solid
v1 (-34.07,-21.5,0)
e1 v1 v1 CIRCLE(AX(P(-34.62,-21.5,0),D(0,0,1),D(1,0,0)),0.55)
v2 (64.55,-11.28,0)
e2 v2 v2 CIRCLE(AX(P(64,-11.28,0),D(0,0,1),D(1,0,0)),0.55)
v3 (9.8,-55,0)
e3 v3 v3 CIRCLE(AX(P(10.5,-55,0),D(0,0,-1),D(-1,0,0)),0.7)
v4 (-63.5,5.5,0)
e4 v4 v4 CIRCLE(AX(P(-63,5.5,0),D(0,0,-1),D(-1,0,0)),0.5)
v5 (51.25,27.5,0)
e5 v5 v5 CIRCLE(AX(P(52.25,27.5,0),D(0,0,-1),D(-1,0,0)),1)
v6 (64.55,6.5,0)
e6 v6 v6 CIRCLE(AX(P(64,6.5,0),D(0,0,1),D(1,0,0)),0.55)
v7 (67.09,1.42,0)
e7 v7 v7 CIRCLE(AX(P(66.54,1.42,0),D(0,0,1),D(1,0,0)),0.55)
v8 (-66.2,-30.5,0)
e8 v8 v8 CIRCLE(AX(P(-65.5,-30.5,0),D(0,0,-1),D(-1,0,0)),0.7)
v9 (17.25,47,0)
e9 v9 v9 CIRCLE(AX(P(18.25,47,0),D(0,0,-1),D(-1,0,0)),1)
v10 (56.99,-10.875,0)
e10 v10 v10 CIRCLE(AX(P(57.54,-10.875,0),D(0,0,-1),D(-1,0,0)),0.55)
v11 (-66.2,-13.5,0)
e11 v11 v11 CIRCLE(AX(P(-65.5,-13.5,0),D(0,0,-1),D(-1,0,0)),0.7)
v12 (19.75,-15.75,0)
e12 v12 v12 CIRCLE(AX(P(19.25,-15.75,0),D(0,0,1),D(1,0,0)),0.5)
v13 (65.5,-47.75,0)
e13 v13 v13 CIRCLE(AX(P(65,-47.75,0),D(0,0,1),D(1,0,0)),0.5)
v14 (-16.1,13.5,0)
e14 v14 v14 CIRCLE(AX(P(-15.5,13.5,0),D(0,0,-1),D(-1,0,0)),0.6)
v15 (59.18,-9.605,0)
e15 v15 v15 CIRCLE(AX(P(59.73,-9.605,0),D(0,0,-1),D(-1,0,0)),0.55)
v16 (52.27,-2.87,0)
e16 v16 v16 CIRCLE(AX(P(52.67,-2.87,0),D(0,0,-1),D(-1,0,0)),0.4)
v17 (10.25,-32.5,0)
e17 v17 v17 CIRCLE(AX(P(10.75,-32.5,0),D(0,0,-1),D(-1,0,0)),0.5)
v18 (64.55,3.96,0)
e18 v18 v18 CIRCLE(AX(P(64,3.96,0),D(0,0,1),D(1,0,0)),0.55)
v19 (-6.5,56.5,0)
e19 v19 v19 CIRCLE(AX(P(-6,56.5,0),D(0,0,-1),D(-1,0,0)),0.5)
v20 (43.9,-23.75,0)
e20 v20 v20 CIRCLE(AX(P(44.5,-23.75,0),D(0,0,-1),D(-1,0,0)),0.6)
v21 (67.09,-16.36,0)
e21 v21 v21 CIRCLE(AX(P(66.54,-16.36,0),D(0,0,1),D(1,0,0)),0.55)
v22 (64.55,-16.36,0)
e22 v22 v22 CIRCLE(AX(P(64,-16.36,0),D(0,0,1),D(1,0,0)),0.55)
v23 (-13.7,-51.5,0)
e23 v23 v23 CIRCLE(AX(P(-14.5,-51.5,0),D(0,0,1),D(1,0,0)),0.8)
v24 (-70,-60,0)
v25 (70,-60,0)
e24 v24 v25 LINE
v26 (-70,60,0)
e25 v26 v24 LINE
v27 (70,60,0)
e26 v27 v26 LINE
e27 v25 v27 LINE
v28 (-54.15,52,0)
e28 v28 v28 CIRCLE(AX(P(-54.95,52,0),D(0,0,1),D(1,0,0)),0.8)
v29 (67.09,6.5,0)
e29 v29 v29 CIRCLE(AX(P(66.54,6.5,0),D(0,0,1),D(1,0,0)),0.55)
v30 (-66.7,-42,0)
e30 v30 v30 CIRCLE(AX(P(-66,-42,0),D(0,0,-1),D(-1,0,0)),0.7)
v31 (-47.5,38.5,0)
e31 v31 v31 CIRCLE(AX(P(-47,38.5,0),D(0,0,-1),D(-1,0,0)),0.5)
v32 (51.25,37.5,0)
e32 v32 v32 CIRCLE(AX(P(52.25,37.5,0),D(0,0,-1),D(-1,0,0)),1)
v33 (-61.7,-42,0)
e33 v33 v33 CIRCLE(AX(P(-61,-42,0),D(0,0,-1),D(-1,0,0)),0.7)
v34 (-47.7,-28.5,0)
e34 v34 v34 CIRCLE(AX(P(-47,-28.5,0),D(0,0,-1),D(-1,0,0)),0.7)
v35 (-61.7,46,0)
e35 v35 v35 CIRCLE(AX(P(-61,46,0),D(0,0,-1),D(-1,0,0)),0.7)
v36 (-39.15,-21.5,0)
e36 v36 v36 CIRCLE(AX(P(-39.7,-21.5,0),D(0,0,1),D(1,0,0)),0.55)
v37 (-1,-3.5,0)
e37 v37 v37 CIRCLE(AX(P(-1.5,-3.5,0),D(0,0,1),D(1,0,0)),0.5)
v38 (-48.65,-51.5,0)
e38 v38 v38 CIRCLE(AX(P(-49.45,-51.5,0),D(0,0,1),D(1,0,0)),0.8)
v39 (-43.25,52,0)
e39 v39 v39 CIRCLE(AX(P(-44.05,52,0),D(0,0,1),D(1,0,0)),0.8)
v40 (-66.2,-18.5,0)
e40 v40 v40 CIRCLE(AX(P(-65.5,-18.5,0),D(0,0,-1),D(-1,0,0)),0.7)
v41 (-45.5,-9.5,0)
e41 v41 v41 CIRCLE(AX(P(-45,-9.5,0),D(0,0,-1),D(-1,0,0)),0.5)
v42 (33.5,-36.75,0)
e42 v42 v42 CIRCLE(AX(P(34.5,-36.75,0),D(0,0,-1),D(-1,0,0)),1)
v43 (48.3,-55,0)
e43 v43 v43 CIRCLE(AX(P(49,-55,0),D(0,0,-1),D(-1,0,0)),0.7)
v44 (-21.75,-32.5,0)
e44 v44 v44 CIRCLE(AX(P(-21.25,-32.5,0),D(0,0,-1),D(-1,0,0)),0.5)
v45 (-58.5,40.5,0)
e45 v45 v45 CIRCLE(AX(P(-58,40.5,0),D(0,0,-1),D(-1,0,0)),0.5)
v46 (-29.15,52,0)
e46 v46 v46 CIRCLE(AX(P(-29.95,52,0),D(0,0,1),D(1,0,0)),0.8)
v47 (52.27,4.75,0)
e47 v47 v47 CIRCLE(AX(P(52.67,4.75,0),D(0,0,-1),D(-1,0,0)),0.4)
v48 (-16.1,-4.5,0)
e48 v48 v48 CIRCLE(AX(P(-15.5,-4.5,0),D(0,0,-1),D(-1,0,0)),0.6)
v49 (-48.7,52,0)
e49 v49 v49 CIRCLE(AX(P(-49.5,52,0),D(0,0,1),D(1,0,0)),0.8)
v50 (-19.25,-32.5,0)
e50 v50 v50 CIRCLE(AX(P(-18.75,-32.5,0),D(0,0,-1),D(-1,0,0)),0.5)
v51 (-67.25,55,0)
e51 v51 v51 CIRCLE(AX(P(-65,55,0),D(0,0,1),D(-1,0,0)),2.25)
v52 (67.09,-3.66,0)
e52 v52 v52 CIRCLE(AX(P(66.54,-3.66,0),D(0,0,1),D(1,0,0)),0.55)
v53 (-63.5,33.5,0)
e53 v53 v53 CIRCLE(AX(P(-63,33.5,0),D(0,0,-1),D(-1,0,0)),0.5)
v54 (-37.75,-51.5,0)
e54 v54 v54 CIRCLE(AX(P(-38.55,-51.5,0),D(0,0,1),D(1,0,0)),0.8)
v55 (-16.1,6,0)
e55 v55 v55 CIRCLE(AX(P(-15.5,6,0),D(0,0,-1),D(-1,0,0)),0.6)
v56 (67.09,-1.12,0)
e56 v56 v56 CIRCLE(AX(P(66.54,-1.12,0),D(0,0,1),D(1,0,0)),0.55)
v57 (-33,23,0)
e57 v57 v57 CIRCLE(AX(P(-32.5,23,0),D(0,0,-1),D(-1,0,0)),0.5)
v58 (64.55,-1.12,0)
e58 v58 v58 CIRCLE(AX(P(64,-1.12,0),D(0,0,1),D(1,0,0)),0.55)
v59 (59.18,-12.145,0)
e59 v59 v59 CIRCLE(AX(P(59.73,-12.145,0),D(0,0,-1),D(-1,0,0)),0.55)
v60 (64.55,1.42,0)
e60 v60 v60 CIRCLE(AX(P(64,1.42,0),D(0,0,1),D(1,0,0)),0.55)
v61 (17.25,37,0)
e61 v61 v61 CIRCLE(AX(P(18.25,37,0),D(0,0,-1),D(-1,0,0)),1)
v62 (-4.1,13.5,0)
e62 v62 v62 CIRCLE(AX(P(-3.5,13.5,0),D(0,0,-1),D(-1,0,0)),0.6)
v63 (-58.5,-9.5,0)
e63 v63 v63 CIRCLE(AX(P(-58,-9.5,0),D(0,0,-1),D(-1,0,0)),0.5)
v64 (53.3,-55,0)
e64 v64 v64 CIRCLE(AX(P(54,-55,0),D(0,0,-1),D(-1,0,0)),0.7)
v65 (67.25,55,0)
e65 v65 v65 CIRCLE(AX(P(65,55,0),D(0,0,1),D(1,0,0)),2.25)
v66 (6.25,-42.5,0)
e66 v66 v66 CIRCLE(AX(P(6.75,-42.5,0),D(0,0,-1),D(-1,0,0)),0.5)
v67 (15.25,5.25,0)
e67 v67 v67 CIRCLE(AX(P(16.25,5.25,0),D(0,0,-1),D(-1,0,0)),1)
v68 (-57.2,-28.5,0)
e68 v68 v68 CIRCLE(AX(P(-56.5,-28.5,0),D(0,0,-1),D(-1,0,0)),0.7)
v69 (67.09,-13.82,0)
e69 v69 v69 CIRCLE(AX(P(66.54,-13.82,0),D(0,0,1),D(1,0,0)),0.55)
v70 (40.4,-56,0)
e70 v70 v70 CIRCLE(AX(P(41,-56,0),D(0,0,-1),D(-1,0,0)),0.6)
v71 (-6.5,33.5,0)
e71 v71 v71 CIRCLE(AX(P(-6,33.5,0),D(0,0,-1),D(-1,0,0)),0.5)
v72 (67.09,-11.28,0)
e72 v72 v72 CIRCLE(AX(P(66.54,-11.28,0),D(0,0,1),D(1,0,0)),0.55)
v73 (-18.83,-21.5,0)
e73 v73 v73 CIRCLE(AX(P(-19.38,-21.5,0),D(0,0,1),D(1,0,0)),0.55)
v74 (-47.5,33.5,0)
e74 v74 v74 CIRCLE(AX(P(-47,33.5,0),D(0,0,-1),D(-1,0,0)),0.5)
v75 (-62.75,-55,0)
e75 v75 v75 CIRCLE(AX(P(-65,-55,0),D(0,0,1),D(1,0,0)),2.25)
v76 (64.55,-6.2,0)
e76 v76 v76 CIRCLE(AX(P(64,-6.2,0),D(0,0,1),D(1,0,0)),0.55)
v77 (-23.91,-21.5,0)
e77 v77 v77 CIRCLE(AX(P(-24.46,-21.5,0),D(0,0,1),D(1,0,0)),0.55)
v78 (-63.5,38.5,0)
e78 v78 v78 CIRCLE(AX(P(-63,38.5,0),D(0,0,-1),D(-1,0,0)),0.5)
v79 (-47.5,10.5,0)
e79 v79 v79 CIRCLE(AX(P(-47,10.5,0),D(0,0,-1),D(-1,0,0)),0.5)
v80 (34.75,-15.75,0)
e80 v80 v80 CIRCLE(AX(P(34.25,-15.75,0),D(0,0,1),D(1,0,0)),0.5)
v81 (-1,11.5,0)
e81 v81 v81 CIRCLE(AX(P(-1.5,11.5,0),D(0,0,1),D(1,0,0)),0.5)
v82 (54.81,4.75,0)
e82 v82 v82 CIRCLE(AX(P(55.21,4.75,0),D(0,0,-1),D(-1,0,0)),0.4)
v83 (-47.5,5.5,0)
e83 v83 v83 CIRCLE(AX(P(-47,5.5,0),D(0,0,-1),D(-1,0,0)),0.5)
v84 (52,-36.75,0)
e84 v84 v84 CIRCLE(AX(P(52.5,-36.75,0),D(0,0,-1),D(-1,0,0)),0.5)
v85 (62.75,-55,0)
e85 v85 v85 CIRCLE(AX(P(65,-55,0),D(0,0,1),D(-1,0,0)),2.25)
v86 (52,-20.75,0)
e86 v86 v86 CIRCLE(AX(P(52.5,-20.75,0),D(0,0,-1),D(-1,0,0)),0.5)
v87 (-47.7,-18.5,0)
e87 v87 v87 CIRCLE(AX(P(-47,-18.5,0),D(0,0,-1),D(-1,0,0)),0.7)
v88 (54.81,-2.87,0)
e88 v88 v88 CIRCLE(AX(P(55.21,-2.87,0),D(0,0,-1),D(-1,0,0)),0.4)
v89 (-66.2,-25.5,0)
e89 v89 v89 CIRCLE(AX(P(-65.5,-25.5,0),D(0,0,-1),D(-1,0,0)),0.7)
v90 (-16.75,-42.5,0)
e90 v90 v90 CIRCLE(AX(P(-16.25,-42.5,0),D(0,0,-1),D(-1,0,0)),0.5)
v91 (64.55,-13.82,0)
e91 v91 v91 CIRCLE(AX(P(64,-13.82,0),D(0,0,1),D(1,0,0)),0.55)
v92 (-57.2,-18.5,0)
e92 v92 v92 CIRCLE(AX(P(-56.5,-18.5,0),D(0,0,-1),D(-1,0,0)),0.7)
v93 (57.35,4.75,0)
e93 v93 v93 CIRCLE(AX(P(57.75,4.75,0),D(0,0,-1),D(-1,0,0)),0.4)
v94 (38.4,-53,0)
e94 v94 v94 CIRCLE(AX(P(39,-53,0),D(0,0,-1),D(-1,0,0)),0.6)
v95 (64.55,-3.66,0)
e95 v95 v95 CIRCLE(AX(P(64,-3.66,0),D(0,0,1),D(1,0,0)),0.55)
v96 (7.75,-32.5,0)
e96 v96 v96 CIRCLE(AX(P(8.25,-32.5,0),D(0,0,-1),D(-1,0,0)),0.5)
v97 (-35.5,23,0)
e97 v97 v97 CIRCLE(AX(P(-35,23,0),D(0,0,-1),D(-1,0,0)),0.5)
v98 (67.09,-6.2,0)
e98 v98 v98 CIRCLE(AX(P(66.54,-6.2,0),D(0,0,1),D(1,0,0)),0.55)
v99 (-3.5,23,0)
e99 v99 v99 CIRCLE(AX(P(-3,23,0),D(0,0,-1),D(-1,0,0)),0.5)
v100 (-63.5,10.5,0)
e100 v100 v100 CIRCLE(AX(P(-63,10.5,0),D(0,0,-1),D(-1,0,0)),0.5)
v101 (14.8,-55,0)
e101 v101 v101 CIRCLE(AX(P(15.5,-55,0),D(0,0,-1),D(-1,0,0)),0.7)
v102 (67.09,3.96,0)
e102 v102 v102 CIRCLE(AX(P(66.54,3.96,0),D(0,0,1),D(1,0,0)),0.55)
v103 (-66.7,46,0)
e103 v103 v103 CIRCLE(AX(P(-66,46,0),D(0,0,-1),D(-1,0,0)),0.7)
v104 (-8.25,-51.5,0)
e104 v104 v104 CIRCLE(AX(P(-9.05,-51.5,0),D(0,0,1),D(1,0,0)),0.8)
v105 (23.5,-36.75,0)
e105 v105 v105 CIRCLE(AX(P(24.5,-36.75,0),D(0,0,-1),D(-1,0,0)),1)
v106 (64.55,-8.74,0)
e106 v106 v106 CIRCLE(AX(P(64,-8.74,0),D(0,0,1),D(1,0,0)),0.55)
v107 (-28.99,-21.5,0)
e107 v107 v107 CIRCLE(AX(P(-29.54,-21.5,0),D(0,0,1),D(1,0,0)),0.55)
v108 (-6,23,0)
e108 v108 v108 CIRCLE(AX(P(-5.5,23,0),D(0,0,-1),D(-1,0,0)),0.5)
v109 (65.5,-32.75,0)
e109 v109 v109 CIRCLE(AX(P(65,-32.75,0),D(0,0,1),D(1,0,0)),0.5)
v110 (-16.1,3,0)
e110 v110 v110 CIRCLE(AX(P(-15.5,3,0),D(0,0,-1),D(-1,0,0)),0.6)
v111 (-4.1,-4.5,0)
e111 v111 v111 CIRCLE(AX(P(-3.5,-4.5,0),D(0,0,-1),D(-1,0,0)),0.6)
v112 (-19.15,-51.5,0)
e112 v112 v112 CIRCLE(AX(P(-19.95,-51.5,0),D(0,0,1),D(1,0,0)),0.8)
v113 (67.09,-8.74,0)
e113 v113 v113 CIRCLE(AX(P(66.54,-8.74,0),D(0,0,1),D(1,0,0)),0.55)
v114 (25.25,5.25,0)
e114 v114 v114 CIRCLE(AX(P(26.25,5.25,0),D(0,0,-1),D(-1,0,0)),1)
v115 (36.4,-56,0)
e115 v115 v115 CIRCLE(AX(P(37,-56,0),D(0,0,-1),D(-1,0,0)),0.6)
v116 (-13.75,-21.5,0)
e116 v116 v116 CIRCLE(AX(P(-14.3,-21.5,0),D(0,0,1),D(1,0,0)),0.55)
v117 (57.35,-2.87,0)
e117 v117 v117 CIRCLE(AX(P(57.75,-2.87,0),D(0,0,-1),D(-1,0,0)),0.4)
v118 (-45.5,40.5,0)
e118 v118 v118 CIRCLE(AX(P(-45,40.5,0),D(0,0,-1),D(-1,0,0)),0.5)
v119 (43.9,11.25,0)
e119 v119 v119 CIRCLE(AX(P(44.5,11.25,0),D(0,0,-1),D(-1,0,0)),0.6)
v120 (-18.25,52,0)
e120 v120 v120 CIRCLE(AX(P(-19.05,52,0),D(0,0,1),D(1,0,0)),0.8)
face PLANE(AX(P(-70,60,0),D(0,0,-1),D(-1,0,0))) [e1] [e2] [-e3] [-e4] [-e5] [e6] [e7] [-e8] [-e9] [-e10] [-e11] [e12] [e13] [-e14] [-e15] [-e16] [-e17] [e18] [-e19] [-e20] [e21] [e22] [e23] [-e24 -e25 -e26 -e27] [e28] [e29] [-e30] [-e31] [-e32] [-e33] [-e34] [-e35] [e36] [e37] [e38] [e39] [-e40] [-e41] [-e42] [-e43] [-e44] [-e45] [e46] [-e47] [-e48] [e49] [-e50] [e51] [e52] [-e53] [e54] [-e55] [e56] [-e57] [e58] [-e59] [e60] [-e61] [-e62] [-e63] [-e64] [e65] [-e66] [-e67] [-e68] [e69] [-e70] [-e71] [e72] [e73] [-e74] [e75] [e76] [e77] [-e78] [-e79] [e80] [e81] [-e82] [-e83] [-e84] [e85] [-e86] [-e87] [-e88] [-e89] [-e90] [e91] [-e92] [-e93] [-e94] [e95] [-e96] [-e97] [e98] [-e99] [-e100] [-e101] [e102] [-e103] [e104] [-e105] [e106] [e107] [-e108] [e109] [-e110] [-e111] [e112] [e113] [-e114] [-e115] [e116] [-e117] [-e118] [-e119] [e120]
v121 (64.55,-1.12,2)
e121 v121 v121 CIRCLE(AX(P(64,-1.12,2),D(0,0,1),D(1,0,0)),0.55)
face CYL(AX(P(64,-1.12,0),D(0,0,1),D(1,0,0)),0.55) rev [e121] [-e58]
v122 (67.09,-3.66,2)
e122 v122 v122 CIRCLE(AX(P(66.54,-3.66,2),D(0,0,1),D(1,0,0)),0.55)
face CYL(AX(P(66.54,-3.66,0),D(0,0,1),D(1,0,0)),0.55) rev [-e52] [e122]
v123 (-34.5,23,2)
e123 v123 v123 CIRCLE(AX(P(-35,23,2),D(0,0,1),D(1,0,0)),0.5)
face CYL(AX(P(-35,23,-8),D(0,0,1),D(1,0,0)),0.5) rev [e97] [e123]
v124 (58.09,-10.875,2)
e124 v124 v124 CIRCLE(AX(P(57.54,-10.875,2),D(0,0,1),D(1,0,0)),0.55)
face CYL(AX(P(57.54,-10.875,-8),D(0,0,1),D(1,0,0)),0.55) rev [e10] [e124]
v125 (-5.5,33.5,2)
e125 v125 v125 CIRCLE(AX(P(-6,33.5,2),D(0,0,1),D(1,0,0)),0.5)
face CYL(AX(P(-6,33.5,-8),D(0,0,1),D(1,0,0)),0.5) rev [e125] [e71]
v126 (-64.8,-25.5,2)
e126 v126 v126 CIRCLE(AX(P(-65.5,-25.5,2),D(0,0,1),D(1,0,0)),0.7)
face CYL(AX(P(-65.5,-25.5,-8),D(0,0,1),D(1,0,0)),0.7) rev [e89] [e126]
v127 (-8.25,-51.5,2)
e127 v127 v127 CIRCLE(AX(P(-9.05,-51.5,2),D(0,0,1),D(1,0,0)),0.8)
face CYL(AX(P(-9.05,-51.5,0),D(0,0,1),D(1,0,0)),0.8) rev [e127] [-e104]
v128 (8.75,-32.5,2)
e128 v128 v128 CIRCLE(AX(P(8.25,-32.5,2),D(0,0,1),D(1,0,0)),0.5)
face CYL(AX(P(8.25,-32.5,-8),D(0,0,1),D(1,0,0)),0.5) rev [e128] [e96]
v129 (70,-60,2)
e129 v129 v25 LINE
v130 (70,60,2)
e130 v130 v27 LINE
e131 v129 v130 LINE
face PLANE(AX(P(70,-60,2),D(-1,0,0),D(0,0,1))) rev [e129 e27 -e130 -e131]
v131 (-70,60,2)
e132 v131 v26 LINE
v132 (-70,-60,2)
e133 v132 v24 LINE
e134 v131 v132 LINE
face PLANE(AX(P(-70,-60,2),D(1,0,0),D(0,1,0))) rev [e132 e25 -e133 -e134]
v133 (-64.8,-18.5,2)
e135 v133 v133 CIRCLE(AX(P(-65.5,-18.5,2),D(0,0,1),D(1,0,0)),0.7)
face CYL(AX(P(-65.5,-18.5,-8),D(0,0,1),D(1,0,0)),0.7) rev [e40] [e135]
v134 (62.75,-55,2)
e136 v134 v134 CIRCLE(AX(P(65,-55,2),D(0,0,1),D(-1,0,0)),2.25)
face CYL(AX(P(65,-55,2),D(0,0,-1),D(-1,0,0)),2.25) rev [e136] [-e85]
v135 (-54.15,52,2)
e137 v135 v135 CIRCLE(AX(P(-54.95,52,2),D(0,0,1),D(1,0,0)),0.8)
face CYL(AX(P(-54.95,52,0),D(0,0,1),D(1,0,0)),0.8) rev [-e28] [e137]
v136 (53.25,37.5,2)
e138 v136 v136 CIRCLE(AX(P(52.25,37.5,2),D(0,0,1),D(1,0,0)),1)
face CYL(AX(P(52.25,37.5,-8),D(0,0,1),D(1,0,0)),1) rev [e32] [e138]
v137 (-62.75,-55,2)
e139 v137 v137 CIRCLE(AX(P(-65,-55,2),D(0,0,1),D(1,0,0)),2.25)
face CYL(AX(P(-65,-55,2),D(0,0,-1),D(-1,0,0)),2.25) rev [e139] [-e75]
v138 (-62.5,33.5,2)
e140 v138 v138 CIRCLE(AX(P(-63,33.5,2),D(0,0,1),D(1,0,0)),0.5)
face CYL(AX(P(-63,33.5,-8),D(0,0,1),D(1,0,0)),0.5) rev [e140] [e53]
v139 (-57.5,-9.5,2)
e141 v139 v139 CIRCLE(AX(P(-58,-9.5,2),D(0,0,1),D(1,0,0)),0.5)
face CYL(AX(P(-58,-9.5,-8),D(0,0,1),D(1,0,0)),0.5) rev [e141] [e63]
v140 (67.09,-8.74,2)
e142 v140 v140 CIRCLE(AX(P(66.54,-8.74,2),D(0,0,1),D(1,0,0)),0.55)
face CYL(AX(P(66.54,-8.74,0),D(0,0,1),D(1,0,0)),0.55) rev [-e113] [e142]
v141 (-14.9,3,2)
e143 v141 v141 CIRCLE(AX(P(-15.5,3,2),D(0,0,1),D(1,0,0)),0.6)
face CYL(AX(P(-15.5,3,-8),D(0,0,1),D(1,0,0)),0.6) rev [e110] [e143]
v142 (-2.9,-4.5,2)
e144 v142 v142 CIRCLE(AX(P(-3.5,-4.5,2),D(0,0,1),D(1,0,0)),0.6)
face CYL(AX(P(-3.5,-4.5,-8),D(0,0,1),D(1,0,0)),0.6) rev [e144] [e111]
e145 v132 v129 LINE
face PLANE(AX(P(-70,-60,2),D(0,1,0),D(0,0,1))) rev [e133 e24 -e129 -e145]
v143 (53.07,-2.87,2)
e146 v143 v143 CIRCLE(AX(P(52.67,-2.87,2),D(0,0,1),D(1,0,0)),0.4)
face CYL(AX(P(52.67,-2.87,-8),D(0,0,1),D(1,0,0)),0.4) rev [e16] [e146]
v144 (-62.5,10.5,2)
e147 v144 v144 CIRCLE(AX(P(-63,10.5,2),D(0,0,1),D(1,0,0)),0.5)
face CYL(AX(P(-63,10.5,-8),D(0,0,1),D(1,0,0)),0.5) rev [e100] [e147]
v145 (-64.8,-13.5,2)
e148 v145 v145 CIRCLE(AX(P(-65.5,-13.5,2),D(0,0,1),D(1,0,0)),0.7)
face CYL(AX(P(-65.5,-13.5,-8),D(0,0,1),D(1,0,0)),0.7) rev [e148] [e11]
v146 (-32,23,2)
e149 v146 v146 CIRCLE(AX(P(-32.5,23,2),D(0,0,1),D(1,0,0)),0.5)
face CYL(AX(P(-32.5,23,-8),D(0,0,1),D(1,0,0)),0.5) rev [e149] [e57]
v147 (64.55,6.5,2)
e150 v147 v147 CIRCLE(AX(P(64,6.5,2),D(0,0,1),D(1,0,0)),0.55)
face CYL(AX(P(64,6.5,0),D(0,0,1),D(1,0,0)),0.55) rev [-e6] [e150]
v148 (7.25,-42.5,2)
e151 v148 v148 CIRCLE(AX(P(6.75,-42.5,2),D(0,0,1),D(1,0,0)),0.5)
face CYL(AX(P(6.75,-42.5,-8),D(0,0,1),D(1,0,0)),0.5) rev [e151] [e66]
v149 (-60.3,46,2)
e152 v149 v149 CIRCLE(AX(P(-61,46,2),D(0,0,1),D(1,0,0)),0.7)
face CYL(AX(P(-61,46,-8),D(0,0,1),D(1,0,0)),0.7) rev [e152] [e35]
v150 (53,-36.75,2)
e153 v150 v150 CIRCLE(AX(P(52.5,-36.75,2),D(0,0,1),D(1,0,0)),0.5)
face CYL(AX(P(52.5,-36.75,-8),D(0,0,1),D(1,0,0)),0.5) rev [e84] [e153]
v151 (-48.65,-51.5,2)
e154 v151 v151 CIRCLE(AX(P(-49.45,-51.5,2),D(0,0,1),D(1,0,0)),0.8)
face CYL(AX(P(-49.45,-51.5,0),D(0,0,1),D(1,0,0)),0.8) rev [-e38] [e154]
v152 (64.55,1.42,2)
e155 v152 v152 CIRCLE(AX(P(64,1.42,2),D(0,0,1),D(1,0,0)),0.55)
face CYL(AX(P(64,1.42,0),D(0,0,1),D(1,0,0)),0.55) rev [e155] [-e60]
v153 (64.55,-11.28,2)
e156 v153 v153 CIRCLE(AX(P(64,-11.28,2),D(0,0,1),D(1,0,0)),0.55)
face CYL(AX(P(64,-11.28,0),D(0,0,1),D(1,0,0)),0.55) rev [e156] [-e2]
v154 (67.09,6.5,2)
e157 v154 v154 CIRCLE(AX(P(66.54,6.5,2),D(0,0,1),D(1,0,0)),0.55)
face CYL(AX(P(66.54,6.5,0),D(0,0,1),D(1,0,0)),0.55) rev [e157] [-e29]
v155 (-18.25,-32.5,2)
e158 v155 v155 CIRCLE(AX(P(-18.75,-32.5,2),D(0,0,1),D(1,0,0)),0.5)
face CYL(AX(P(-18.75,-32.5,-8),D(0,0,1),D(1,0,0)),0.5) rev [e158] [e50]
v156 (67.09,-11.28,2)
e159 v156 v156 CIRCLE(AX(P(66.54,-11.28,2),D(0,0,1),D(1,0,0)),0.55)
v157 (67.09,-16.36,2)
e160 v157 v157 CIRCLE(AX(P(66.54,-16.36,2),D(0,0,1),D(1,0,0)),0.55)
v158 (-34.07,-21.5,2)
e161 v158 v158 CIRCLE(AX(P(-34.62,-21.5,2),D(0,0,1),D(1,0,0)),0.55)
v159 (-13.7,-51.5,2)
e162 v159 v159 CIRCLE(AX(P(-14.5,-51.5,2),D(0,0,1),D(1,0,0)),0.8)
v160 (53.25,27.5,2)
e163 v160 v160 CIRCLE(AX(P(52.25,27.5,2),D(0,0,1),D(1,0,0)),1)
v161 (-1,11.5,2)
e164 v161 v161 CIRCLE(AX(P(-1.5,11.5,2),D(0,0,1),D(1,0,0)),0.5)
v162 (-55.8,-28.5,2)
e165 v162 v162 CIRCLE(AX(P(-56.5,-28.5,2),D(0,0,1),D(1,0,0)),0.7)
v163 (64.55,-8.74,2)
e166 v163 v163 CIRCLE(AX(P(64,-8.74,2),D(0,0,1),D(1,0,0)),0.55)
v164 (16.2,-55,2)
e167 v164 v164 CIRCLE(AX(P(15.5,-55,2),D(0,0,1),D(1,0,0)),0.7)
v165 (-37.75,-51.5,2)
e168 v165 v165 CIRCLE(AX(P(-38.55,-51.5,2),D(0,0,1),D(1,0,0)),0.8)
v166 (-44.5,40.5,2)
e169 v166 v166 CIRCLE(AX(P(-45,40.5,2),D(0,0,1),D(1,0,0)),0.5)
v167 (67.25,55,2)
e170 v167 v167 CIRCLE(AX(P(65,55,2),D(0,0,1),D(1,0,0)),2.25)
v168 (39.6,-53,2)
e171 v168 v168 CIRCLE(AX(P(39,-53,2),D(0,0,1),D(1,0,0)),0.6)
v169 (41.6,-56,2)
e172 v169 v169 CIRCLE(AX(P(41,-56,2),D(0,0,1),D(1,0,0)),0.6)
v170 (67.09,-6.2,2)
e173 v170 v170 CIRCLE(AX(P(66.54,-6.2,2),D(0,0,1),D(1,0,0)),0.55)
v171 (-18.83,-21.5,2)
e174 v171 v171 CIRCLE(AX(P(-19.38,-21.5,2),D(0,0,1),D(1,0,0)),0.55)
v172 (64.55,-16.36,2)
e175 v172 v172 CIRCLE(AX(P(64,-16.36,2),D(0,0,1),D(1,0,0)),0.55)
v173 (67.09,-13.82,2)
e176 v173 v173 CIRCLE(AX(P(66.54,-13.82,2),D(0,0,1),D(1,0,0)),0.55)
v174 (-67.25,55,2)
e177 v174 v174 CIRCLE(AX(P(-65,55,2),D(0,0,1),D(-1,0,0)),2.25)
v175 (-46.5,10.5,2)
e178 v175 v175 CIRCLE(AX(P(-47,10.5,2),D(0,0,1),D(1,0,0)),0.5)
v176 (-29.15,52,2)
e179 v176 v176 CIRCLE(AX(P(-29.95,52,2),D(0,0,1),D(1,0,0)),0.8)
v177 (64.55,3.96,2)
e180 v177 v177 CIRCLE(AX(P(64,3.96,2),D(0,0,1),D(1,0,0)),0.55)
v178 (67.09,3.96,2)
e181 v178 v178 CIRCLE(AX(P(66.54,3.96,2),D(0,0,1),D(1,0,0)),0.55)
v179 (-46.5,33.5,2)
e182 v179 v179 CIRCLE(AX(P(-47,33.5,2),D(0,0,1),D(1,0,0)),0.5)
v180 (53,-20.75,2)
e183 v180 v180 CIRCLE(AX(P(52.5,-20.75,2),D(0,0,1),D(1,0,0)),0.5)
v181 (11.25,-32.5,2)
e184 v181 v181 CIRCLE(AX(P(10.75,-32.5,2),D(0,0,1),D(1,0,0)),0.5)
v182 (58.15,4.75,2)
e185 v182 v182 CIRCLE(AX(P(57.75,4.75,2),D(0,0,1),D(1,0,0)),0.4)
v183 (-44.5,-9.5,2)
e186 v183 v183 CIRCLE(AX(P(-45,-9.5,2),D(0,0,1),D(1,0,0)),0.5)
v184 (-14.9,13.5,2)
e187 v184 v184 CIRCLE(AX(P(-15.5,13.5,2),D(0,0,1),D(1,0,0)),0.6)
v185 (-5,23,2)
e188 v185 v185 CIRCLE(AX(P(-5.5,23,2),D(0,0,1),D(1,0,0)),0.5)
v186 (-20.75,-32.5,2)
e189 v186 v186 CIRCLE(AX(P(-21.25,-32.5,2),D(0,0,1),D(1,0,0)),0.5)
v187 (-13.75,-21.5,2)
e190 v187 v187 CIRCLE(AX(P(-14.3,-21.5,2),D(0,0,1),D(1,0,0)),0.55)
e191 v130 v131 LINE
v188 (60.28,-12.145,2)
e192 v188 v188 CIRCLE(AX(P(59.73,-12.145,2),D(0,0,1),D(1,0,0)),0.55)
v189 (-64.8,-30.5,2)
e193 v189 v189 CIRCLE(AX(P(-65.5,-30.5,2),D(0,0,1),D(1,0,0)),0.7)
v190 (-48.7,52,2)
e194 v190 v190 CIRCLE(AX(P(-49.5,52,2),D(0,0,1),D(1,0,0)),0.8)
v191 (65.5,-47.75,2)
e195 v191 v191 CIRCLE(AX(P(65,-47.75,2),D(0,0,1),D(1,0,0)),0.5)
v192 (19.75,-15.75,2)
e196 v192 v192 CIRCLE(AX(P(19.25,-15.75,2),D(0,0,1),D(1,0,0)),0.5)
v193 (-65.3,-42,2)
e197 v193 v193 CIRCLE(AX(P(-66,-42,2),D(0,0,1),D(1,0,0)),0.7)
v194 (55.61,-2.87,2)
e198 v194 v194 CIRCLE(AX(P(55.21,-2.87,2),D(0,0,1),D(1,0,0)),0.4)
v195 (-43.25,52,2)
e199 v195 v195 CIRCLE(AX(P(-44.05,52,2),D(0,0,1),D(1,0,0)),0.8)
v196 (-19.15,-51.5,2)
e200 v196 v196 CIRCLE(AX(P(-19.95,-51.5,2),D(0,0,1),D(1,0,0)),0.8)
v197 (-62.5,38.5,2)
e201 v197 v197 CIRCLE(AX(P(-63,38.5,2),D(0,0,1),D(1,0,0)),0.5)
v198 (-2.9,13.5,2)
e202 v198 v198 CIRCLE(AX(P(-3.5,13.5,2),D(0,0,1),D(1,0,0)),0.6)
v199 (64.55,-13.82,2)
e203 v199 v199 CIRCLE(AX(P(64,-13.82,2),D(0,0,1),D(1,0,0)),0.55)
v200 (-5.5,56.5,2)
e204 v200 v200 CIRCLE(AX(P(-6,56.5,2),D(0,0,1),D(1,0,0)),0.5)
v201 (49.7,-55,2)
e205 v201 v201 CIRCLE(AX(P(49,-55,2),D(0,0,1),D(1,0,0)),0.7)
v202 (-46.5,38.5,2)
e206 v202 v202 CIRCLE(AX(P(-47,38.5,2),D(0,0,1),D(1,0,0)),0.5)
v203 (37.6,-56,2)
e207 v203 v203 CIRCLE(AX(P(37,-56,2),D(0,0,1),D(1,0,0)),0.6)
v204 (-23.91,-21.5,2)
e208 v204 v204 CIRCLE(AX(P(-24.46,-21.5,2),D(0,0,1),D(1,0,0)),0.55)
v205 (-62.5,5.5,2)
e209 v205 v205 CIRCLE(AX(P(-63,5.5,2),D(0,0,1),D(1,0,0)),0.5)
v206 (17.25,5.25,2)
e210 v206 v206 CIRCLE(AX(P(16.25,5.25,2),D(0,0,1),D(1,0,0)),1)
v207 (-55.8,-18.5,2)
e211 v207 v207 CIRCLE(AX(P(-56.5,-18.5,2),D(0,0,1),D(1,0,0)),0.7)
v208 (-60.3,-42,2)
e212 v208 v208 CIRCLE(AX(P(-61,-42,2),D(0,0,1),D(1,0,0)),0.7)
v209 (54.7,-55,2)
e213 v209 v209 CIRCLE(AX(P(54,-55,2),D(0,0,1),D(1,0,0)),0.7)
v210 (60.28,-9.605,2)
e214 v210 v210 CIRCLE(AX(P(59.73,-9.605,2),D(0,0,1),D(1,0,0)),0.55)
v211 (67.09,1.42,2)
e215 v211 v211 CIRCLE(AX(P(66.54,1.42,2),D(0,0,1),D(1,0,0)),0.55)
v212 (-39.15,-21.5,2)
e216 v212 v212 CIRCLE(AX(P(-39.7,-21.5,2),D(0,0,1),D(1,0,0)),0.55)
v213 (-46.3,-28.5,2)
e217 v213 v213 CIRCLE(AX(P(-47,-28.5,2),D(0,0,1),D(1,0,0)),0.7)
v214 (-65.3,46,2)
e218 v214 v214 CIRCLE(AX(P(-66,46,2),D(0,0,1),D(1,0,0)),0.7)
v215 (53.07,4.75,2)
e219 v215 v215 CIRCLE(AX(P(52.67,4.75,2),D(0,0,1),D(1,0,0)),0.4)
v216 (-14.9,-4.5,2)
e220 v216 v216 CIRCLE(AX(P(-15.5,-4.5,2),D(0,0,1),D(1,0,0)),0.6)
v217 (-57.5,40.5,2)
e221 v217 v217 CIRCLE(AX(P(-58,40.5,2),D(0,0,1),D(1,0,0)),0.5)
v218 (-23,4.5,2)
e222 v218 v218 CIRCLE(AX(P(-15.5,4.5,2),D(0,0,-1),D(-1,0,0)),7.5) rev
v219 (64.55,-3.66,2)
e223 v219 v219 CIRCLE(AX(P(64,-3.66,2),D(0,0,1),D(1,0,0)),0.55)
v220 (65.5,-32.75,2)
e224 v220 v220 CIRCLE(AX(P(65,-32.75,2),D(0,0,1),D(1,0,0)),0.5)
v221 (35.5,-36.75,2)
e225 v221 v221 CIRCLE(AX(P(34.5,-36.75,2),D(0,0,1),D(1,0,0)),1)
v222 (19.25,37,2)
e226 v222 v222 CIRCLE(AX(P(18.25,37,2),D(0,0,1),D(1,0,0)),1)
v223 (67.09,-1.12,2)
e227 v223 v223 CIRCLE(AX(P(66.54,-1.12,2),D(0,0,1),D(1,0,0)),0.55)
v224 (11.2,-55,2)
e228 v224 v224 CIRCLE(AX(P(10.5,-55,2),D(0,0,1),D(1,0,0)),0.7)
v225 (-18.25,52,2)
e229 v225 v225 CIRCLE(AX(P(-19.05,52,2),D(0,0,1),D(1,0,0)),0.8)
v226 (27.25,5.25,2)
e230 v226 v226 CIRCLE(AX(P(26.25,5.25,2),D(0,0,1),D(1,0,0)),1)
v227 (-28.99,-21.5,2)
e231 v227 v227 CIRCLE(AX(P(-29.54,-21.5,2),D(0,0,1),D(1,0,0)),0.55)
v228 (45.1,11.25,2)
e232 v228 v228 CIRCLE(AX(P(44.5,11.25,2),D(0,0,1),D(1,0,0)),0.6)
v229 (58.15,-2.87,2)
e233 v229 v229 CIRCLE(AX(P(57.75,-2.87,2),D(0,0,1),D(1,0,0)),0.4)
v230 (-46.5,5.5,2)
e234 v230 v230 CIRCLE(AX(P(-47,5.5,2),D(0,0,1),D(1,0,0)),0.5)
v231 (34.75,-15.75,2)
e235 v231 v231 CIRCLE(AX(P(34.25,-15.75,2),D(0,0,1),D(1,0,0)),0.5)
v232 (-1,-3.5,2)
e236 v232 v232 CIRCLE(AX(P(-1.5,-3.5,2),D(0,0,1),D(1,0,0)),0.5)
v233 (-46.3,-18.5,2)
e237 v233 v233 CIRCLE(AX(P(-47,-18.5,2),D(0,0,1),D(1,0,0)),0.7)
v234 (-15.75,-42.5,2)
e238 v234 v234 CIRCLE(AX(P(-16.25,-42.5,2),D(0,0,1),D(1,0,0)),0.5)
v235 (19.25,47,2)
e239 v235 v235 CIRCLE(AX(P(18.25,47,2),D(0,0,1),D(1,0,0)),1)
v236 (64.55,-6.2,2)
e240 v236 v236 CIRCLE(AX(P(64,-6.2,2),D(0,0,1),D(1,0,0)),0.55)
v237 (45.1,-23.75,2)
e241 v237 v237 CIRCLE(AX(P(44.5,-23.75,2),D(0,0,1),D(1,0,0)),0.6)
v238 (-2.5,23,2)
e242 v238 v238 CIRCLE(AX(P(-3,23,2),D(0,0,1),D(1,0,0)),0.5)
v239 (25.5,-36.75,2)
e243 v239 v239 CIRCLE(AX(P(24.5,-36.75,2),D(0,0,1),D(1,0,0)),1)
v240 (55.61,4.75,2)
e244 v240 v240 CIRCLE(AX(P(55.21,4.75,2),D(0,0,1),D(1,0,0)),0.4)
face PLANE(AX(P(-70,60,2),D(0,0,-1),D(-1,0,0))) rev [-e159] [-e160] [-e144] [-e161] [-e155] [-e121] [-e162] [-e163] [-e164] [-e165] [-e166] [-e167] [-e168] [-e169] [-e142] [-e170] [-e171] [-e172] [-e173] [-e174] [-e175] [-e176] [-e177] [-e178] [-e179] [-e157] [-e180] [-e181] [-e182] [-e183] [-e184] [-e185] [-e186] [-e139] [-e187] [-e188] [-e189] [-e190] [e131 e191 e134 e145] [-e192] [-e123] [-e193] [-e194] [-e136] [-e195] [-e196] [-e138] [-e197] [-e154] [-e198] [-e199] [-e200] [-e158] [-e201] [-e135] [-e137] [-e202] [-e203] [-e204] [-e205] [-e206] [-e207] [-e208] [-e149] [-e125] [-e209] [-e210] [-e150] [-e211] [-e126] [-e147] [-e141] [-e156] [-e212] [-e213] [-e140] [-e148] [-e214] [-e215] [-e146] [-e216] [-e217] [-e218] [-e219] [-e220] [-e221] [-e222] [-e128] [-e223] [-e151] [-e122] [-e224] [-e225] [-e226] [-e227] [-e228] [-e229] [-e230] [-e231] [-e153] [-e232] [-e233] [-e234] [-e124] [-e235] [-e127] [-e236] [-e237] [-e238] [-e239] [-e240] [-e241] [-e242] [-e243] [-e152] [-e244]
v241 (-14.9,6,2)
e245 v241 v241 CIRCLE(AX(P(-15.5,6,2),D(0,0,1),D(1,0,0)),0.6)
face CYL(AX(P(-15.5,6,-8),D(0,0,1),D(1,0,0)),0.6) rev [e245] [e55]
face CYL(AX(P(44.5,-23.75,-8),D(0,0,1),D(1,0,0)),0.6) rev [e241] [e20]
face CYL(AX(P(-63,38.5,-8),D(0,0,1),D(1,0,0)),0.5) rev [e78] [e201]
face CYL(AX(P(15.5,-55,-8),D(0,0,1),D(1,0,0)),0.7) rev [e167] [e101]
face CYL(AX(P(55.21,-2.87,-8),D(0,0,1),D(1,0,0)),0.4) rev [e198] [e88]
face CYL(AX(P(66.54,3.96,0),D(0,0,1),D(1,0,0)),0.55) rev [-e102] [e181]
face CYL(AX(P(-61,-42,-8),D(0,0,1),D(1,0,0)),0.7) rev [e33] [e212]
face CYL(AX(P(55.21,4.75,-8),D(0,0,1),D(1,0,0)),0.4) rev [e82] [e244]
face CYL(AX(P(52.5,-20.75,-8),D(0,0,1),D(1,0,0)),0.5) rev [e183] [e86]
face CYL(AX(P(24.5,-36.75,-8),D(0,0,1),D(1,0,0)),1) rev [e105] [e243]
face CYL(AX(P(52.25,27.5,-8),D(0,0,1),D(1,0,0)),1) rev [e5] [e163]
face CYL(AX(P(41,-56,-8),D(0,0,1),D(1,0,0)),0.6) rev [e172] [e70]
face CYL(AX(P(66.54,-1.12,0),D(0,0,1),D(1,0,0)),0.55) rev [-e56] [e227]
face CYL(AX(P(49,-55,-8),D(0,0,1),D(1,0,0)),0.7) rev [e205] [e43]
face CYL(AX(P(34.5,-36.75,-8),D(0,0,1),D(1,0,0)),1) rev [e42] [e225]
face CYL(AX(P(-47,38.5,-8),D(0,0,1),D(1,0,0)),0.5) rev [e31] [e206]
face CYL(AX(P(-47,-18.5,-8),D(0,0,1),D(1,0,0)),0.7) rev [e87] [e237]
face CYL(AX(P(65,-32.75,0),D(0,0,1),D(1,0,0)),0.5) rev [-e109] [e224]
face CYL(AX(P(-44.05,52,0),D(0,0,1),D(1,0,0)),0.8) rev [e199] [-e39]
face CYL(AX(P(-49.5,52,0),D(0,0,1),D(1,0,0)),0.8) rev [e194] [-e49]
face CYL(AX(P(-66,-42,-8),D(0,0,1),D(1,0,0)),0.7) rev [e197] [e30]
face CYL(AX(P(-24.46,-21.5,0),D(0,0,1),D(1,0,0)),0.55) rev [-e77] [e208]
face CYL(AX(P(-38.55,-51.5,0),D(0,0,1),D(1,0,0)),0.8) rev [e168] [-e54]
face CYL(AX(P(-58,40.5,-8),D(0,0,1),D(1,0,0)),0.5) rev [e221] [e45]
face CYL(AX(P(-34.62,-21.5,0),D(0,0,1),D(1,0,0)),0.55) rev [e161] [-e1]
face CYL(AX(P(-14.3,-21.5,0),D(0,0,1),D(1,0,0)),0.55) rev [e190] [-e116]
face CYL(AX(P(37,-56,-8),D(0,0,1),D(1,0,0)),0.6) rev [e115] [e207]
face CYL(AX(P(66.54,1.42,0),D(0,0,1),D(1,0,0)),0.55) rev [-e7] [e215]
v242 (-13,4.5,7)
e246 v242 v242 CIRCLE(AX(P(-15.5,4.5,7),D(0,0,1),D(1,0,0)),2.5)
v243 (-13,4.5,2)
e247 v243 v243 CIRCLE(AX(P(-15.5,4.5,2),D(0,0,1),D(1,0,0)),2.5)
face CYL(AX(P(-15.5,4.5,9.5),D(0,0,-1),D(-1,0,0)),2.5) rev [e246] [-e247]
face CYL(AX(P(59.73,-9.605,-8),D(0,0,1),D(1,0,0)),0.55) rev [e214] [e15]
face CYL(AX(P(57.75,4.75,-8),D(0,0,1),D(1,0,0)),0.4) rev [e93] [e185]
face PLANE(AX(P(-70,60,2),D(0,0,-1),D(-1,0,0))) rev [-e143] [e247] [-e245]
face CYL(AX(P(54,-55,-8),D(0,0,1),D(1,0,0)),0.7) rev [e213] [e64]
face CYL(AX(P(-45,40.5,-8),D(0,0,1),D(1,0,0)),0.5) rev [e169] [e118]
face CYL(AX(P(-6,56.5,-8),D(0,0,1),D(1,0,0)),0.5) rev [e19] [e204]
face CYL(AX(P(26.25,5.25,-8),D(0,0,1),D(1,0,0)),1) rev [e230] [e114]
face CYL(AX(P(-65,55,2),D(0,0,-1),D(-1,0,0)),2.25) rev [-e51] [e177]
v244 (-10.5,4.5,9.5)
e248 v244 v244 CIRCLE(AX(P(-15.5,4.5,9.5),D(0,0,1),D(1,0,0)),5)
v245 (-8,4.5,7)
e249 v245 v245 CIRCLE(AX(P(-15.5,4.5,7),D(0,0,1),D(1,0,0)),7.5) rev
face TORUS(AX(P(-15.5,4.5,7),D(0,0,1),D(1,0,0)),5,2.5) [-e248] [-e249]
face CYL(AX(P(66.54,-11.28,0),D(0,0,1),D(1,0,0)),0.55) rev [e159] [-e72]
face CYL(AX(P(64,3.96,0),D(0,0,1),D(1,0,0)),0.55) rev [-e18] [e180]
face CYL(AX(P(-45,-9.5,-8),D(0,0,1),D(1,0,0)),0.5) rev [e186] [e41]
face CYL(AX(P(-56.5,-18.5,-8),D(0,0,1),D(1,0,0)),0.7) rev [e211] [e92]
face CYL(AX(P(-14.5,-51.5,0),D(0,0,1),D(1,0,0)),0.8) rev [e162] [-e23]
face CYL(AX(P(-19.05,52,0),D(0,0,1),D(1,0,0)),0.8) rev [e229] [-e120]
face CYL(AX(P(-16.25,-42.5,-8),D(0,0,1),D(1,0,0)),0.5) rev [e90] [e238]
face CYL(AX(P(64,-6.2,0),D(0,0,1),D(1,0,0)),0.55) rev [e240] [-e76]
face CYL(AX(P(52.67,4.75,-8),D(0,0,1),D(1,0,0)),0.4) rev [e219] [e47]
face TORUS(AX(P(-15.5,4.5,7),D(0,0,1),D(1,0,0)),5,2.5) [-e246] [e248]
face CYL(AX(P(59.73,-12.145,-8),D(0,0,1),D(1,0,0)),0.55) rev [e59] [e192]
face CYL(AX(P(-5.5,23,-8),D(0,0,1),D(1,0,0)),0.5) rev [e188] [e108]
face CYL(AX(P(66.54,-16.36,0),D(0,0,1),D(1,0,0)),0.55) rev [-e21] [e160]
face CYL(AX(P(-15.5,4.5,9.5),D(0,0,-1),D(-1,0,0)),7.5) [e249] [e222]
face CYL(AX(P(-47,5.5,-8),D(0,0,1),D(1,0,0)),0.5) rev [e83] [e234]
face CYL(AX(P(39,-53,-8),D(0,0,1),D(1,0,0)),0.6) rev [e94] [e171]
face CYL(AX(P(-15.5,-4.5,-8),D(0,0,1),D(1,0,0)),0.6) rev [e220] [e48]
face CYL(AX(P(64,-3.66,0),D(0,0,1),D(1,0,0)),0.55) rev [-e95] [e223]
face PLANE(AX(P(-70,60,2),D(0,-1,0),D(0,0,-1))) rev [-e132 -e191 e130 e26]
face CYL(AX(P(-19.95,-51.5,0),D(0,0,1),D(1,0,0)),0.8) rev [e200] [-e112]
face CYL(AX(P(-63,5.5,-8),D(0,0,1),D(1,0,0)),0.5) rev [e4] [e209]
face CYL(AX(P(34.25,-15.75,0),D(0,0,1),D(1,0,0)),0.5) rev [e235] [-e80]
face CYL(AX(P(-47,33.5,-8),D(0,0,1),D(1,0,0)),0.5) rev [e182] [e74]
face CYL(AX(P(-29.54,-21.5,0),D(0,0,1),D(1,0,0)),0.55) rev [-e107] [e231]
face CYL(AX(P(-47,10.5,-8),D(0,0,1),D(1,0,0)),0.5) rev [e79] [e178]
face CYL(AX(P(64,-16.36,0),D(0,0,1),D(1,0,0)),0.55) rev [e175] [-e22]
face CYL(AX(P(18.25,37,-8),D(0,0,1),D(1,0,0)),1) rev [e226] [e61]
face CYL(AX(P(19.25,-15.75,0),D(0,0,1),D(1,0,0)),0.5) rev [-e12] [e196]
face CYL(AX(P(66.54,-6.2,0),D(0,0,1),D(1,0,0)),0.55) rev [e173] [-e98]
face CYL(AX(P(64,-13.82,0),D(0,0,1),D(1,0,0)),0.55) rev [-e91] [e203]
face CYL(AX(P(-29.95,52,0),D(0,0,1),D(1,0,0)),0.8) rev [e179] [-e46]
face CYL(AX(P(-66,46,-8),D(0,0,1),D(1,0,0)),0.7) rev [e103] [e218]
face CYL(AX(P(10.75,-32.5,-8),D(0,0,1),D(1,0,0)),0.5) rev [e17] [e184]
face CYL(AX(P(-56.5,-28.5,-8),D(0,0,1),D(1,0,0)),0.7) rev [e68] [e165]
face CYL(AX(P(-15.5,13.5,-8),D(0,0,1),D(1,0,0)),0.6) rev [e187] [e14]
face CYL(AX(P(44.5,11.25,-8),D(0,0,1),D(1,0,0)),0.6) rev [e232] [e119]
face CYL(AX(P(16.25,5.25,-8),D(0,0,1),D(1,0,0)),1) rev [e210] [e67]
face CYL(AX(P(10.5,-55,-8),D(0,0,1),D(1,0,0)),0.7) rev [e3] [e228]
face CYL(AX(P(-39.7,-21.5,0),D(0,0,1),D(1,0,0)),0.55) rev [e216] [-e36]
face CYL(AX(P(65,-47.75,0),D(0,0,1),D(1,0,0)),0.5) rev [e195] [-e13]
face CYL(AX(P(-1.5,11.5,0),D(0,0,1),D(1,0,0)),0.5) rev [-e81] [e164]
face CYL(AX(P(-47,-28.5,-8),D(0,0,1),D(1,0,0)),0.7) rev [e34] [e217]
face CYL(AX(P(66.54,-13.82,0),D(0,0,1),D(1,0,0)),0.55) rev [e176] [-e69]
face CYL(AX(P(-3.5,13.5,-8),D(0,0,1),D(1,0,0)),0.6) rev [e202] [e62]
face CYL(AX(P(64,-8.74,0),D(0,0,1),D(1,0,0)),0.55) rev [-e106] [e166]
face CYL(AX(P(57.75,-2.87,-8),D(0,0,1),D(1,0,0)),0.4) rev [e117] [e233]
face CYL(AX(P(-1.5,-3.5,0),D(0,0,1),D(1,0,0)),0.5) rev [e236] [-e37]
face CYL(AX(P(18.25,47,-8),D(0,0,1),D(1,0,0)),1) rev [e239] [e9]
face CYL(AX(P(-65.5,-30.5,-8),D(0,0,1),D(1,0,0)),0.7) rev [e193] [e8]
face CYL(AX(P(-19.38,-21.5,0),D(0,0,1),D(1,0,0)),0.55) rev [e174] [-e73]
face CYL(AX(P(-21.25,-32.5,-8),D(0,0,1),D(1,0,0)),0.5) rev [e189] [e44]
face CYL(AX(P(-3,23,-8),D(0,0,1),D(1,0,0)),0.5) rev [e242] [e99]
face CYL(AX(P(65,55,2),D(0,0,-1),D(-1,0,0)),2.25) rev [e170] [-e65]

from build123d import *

# Parameters (mm, degrees)
SKETCH_1_W          = 140
SKETCH_1_H          = 120
SKETCH_1_R          = 2.25
EXTRUDE_1_DEPTH     = 2
SKETCH_2_R          = 0.55
SKETCH_2_R_2        = 0.5
SKETCH_2_R_3        = 0.8
CUT_EXTRUDE_1_DEPTH = 2
SKETCH_3_R          = 0.4
SKETCH_3_R_2        = 0.55
SKETCH_3_R_3        = 0.7
SKETCH_3_R_4        = 0.6
SKETCH_3_R_5        = 0.5
SKETCH_3_R_6        = 1
CUT_EXTRUDE_2_DEPTH = 10
SKETCH_4_R          = 0.6
SKETCH_4_R_2        = 0.7
SKETCH_4_R_3        = 0.5
CUT_EXTRUDE_3_DEPTH = 10
SKETCH_5_R          = 7.5
SKETCH_5_R_2        = 2.5
EXTRUDE_2_DEPTH     = 7.5
FILLET_1_R          = 2.5


with BuildPart() as part:
    # Эскиз1 → Вытянуть1 (new body)
    with BuildSketch(Plane.XY):
        Rectangle(SKETCH_1_W, SKETCH_1_H)
        with Locations((-65, -55)):
            Circle(SKETCH_1_R, mode=Mode.SUBTRACT)
        with Locations(Location((65, -55, 0), (0, 0, 180))):
            Circle(SKETCH_1_R, mode=Mode.SUBTRACT)
        with Locations((65, 55)):
            Circle(SKETCH_1_R, mode=Mode.SUBTRACT)
        with Locations(Location((-65, 55, 0), (0, 0, 180))):
            Circle(SKETCH_1_R, mode=Mode.SUBTRACT)
    extrude(amount=EXTRUDE_1_DEPTH)

    # Эскиз2 → Вырез-Вытянуть1 (cut)
    with BuildSketch(Plane.XY.offset(2)):
        with Locations((64, 6.5)):
            Circle(SKETCH_2_R)
        with Locations((66.54, 6.5)):
            Circle(SKETCH_2_R)
        with Locations((64, 3.96)):
            Circle(SKETCH_2_R)
        with Locations((66.54, 3.96)):
            Circle(SKETCH_2_R)
        with Locations((64, 1.42)):
            Circle(SKETCH_2_R)
        with Locations((66.54, 1.42)):
            Circle(SKETCH_2_R)
        with Locations((64, -1.12)):
            Circle(SKETCH_2_R)
        with Locations((66.54, -1.12)):
            Circle(SKETCH_2_R)
        with Locations((64, -3.66)):
            Circle(SKETCH_2_R)
        with Locations((66.54, -3.66)):
            Circle(SKETCH_2_R)
        with Locations((64, -6.2)):
            Circle(SKETCH_2_R)
        with Locations((66.54, -6.2)):
            Circle(SKETCH_2_R)
        with Locations((64, -8.74)):
            Circle(SKETCH_2_R)
        with Locations((66.54, -8.74)):
            Circle(SKETCH_2_R)
        with Locations((64, -11.28)):
            Circle(SKETCH_2_R)
        with Locations((66.54, -11.28)):
            Circle(SKETCH_2_R)
        with Locations((64, -13.82)):
            Circle(SKETCH_2_R)
        with Locations((66.54, -13.82)):
            Circle(SKETCH_2_R)
        with Locations((64, -16.36)):
            Circle(SKETCH_2_R)
        with Locations((66.54, -16.36)):
            Circle(SKETCH_2_R)
        with Locations((65, -47.75)):
            Circle(SKETCH_2_R_2)
        with Locations((65, -32.75)):
            Circle(SKETCH_2_R_2)
        with Locations((-54.95, 52)):
            Circle(SKETCH_2_R_3)
        with Locations((-49.5, 52)):
            Circle(SKETCH_2_R_3)
        with Locations((-44.05, 52)):
            Circle(SKETCH_2_R_3)
        with Locations((-29.95, 52)):
            Circle(SKETCH_2_R_3)
        with Locations((-34.62, -21.5)):
            Circle(SKETCH_2_R)
        with Locations((-19.05, 52)):
            Circle(SKETCH_2_R_3)
        with Locations((-49.45, -51.5)):
            Circle(SKETCH_2_R_3)
        with Locations((-29.54, -21.5)):
            Circle(SKETCH_2_R)
        with Locations((-38.55, -51.5)):
            Circle(SKETCH_2_R_3)
        with Locations((-19.95, -51.5)):
            Circle(SKETCH_2_R_3)
        with Locations((-14.5, -51.5)):
            Circle(SKETCH_2_R_3)
        with Locations((-9.05, -51.5)):
            Circle(SKETCH_2_R_3)
        with Locations((-24.46, -21.5)):
            Circle(SKETCH_2_R)
        with Locations((-19.38, -21.5)):
            Circle(SKETCH_2_R)
        with Locations((-14.3, -21.5)):
            Circle(SKETCH_2_R)
        with Locations((-39.7, -21.5)):
            Circle(SKETCH_2_R)
        with Locations((19.25, -15.75)):
            Circle(SKETCH_2_R_2)
        with Locations((34.25, -15.75)):
            Circle(SKETCH_2_R_2)
        with Locations((-1.5, -3.5)):
            Circle(SKETCH_2_R_2)
        with Locations((-1.5, 11.5)):
            Circle(SKETCH_2_R_2)
    extrude(amount=-CUT_EXTRUDE_1_DEPTH, mode=Mode.SUBTRACT)

    # Эскиз3 → Вырез-Вытянуть2 (cut)
    with BuildSketch(Plane.XY.offset(2)):
        with Locations((57.75, 4.75)):
            Circle(SKETCH_3_R)
        with Locations((57.75, -2.87)):
            Circle(SKETCH_3_R)
        with Locations((55.21, -2.87)):
            Circle(SKETCH_3_R)
        with Locations((55.21, 4.75)):
            Circle(SKETCH_3_R)
        with Locations((52.67, -2.87)):
            Circle(SKETCH_3_R)
        with Locations((52.67, 4.75)):
            Circle(SKETCH_3_R)
        with Locations((59.73, -9.605)):
            Circle(SKETCH_3_R_2)
        with Locations((59.73, -12.145)):
            Circle(SKETCH_3_R_2)
        with Locations((57.54, -10.875)):
            Circle(SKETCH_3_R_2)
        with Locations((49, -55)):
            Circle(SKETCH_3_R_3)
        with Locations((10.5, -55)):
            Circle(SKETCH_3_R_3)
        with Locations((54, -55)):
            Circle(SKETCH_3_R_3)
        with Locations((15.5, -55)):
            Circle(SKETCH_3_R_3)
        with Locations((-65.5, -18.5)):
            Circle(SKETCH_3_R_3)
        with Locations((-65.5, -13.5)):
            Circle(SKETCH_3_R_3)
        with Locations((-65.5, -30.5)):
            Circle(SKETCH_3_R_3)
        with Locations((-65.5, -25.5)):
            Circle(SKETCH_3_R_3)
        with Locations((37, -56)):
            Circle(SKETCH_3_R_4)
        with Locations((41, -56)):
            Circle(SKETCH_3_R_4)
        with Locations((39, -53)):
            Circle(SKETCH_3_R_4)
        with Locations((52.5, -36.75)):
            Circle(SKETCH_3_R_5)
        with Locations((52.5, -20.75)):
            Circle(SKETCH_3_R_5)
        with Locations((44.5, -23.75)):
            Circle(SKETCH_3_R_4)
        with Locations((44.5, 11.25)):
            Circle(SKETCH_3_R_4)
        with Locations((52.25, 27.5)):
            Circle(SKETCH_3_R_6)
        with Locations((52.25, 37.5)):
            Circle(SKETCH_3_R_6)
        with Locations((18.25, 37)):
            Circle(SKETCH_3_R_6)
        with Locations((18.25, 47)):
            Circle(SKETCH_3_R_6)
        with Locations((16.25, 5.25)):
            Circle(SKETCH_3_R_6)
        with Locations((26.25, 5.25)):
            Circle(SKETCH_3_R_6)
        with Locations((24.5, -36.75)):
            Circle(SKETCH_3_R_6)
        with Locations((34.5, -36.75)):
            Circle(SKETCH_3_R_6)
        with Locations((-66, 46)):
            Circle(SKETCH_3_R_3)
        with Locations((-61, 46)):
            Circle(SKETCH_3_R_3)
        with Locations((-66, -42)):
            Circle(SKETCH_3_R_3)
        with Locations((-61, -42)):
            Circle(SKETCH_3_R_3)
    extrude(amount=-CUT_EXTRUDE_2_DEPTH, mode=Mode.SUBTRACT)

    # Эскиз4 → Вырез-Вытянуть3 (cut)
    with BuildSketch(Plane.XY.offset(2)):
        with Locations((-15.5, -4.5)):
            Circle(SKETCH_4_R)
        with Locations((-15.5, 3)):
            Circle(SKETCH_4_R)
        with Locations((-15.5, 6)):
            Circle(SKETCH_4_R)
        with Locations((-15.5, 13.5)):
            Circle(SKETCH_4_R)
        with Locations((-3.5, 13.5)):
            Circle(SKETCH_4_R)
        with Locations((-3.5, -4.5)):
            Circle(SKETCH_4_R)
        with Locations((-56.5, -28.5)):
            Circle(SKETCH_4_R_2)
        with Locations((-56.5, -18.5)):
            Circle(SKETCH_4_R_2)
        with Locations((-6, 33.5)):
            Circle(SKETCH_4_R_3)
        with Locations((-6, 56.5)):
            Circle(SKETCH_4_R_3)
        with Locations((-47, -28.5)):
            Circle(SKETCH_4_R_2)
        with Locations((-47, -18.5)):
            Circle(SKETCH_4_R_2)
        with Locations((-63, 5.5)):
            Circle(SKETCH_4_R_3)
        with Locations((-63, 38.5)):
            Circle(SKETCH_4_R_3)
        with Locations((-63, 33.5)):
            Circle(SKETCH_4_R_3)
        with Locations((-63, 10.5)):
            Circle(SKETCH_4_R_3)
        with Locations((-47, 5.5)):
            Circle(SKETCH_4_R_3)
        with Locations((-47, 38.5)):
            Circle(SKETCH_4_R_3)
        with Locations((-47, 33.5)):
            Circle(SKETCH_4_R_3)
        with Locations((-47, 10.5)):
            Circle(SKETCH_4_R_3)
        with Locations((-58, -9.5)):
            Circle(SKETCH_4_R_3)
        with Locations((-45, -9.5)):
            Circle(SKETCH_4_R_3)
        with Locations((-58, 40.5)):
            Circle(SKETCH_4_R_3)
        with Locations((-45, 40.5)):
            Circle(SKETCH_4_R_3)
        with Locations((-35, 23)):
            Circle(SKETCH_4_R_3)
        with Locations((-3, 23)):
            Circle(SKETCH_4_R_3)
        with Locations((-32.5, 23)):
            Circle(SKETCH_4_R_3)
        with Locations((-5.5, 23)):
            Circle(SKETCH_4_R_3)
        with Locations((-16.25, -42.5)):
            Circle(SKETCH_4_R_3)
        with Locations((6.75, -42.5)):
            Circle(SKETCH_4_R_3)
        with Locations((-21.25, -32.5)):
            Circle(SKETCH_4_R_3)
        with Locations((10.75, -32.5)):
            Circle(SKETCH_4_R_3)
        with Locations((-18.75, -32.5)):
            Circle(SKETCH_4_R_3)
        with Locations((8.25, -32.5)):
            Circle(SKETCH_4_R_3)
    extrude(amount=-CUT_EXTRUDE_3_DEPTH, mode=Mode.SUBTRACT)

    # Эскиз5 → Вытянуть2 (add)
    with BuildSketch(Plane.XY.offset(2)):
        with Locations(Location((-15.5, 4.5, 0), (0, 0, 180))):
            Circle(SKETCH_5_R)
        with Locations((-15.5, 4.5)):
            Circle(SKETCH_5_R_2, mode=Mode.SUBTRACT)
    extrude(amount=EXTRUDE_2_DEPTH)

    # Скругление1
    fillet_1_edges = [part.edges().sort_by_distance(p)[0] for p in [
        (-8, 4.5, 9.5),
        (-18, 4.5, 9.5),
    ]]
    fillet(fillet_1_edges, radius=FILLET_1_R - 0.0001)  # a hair under: the kernel refuses the full size


solid = part.part
